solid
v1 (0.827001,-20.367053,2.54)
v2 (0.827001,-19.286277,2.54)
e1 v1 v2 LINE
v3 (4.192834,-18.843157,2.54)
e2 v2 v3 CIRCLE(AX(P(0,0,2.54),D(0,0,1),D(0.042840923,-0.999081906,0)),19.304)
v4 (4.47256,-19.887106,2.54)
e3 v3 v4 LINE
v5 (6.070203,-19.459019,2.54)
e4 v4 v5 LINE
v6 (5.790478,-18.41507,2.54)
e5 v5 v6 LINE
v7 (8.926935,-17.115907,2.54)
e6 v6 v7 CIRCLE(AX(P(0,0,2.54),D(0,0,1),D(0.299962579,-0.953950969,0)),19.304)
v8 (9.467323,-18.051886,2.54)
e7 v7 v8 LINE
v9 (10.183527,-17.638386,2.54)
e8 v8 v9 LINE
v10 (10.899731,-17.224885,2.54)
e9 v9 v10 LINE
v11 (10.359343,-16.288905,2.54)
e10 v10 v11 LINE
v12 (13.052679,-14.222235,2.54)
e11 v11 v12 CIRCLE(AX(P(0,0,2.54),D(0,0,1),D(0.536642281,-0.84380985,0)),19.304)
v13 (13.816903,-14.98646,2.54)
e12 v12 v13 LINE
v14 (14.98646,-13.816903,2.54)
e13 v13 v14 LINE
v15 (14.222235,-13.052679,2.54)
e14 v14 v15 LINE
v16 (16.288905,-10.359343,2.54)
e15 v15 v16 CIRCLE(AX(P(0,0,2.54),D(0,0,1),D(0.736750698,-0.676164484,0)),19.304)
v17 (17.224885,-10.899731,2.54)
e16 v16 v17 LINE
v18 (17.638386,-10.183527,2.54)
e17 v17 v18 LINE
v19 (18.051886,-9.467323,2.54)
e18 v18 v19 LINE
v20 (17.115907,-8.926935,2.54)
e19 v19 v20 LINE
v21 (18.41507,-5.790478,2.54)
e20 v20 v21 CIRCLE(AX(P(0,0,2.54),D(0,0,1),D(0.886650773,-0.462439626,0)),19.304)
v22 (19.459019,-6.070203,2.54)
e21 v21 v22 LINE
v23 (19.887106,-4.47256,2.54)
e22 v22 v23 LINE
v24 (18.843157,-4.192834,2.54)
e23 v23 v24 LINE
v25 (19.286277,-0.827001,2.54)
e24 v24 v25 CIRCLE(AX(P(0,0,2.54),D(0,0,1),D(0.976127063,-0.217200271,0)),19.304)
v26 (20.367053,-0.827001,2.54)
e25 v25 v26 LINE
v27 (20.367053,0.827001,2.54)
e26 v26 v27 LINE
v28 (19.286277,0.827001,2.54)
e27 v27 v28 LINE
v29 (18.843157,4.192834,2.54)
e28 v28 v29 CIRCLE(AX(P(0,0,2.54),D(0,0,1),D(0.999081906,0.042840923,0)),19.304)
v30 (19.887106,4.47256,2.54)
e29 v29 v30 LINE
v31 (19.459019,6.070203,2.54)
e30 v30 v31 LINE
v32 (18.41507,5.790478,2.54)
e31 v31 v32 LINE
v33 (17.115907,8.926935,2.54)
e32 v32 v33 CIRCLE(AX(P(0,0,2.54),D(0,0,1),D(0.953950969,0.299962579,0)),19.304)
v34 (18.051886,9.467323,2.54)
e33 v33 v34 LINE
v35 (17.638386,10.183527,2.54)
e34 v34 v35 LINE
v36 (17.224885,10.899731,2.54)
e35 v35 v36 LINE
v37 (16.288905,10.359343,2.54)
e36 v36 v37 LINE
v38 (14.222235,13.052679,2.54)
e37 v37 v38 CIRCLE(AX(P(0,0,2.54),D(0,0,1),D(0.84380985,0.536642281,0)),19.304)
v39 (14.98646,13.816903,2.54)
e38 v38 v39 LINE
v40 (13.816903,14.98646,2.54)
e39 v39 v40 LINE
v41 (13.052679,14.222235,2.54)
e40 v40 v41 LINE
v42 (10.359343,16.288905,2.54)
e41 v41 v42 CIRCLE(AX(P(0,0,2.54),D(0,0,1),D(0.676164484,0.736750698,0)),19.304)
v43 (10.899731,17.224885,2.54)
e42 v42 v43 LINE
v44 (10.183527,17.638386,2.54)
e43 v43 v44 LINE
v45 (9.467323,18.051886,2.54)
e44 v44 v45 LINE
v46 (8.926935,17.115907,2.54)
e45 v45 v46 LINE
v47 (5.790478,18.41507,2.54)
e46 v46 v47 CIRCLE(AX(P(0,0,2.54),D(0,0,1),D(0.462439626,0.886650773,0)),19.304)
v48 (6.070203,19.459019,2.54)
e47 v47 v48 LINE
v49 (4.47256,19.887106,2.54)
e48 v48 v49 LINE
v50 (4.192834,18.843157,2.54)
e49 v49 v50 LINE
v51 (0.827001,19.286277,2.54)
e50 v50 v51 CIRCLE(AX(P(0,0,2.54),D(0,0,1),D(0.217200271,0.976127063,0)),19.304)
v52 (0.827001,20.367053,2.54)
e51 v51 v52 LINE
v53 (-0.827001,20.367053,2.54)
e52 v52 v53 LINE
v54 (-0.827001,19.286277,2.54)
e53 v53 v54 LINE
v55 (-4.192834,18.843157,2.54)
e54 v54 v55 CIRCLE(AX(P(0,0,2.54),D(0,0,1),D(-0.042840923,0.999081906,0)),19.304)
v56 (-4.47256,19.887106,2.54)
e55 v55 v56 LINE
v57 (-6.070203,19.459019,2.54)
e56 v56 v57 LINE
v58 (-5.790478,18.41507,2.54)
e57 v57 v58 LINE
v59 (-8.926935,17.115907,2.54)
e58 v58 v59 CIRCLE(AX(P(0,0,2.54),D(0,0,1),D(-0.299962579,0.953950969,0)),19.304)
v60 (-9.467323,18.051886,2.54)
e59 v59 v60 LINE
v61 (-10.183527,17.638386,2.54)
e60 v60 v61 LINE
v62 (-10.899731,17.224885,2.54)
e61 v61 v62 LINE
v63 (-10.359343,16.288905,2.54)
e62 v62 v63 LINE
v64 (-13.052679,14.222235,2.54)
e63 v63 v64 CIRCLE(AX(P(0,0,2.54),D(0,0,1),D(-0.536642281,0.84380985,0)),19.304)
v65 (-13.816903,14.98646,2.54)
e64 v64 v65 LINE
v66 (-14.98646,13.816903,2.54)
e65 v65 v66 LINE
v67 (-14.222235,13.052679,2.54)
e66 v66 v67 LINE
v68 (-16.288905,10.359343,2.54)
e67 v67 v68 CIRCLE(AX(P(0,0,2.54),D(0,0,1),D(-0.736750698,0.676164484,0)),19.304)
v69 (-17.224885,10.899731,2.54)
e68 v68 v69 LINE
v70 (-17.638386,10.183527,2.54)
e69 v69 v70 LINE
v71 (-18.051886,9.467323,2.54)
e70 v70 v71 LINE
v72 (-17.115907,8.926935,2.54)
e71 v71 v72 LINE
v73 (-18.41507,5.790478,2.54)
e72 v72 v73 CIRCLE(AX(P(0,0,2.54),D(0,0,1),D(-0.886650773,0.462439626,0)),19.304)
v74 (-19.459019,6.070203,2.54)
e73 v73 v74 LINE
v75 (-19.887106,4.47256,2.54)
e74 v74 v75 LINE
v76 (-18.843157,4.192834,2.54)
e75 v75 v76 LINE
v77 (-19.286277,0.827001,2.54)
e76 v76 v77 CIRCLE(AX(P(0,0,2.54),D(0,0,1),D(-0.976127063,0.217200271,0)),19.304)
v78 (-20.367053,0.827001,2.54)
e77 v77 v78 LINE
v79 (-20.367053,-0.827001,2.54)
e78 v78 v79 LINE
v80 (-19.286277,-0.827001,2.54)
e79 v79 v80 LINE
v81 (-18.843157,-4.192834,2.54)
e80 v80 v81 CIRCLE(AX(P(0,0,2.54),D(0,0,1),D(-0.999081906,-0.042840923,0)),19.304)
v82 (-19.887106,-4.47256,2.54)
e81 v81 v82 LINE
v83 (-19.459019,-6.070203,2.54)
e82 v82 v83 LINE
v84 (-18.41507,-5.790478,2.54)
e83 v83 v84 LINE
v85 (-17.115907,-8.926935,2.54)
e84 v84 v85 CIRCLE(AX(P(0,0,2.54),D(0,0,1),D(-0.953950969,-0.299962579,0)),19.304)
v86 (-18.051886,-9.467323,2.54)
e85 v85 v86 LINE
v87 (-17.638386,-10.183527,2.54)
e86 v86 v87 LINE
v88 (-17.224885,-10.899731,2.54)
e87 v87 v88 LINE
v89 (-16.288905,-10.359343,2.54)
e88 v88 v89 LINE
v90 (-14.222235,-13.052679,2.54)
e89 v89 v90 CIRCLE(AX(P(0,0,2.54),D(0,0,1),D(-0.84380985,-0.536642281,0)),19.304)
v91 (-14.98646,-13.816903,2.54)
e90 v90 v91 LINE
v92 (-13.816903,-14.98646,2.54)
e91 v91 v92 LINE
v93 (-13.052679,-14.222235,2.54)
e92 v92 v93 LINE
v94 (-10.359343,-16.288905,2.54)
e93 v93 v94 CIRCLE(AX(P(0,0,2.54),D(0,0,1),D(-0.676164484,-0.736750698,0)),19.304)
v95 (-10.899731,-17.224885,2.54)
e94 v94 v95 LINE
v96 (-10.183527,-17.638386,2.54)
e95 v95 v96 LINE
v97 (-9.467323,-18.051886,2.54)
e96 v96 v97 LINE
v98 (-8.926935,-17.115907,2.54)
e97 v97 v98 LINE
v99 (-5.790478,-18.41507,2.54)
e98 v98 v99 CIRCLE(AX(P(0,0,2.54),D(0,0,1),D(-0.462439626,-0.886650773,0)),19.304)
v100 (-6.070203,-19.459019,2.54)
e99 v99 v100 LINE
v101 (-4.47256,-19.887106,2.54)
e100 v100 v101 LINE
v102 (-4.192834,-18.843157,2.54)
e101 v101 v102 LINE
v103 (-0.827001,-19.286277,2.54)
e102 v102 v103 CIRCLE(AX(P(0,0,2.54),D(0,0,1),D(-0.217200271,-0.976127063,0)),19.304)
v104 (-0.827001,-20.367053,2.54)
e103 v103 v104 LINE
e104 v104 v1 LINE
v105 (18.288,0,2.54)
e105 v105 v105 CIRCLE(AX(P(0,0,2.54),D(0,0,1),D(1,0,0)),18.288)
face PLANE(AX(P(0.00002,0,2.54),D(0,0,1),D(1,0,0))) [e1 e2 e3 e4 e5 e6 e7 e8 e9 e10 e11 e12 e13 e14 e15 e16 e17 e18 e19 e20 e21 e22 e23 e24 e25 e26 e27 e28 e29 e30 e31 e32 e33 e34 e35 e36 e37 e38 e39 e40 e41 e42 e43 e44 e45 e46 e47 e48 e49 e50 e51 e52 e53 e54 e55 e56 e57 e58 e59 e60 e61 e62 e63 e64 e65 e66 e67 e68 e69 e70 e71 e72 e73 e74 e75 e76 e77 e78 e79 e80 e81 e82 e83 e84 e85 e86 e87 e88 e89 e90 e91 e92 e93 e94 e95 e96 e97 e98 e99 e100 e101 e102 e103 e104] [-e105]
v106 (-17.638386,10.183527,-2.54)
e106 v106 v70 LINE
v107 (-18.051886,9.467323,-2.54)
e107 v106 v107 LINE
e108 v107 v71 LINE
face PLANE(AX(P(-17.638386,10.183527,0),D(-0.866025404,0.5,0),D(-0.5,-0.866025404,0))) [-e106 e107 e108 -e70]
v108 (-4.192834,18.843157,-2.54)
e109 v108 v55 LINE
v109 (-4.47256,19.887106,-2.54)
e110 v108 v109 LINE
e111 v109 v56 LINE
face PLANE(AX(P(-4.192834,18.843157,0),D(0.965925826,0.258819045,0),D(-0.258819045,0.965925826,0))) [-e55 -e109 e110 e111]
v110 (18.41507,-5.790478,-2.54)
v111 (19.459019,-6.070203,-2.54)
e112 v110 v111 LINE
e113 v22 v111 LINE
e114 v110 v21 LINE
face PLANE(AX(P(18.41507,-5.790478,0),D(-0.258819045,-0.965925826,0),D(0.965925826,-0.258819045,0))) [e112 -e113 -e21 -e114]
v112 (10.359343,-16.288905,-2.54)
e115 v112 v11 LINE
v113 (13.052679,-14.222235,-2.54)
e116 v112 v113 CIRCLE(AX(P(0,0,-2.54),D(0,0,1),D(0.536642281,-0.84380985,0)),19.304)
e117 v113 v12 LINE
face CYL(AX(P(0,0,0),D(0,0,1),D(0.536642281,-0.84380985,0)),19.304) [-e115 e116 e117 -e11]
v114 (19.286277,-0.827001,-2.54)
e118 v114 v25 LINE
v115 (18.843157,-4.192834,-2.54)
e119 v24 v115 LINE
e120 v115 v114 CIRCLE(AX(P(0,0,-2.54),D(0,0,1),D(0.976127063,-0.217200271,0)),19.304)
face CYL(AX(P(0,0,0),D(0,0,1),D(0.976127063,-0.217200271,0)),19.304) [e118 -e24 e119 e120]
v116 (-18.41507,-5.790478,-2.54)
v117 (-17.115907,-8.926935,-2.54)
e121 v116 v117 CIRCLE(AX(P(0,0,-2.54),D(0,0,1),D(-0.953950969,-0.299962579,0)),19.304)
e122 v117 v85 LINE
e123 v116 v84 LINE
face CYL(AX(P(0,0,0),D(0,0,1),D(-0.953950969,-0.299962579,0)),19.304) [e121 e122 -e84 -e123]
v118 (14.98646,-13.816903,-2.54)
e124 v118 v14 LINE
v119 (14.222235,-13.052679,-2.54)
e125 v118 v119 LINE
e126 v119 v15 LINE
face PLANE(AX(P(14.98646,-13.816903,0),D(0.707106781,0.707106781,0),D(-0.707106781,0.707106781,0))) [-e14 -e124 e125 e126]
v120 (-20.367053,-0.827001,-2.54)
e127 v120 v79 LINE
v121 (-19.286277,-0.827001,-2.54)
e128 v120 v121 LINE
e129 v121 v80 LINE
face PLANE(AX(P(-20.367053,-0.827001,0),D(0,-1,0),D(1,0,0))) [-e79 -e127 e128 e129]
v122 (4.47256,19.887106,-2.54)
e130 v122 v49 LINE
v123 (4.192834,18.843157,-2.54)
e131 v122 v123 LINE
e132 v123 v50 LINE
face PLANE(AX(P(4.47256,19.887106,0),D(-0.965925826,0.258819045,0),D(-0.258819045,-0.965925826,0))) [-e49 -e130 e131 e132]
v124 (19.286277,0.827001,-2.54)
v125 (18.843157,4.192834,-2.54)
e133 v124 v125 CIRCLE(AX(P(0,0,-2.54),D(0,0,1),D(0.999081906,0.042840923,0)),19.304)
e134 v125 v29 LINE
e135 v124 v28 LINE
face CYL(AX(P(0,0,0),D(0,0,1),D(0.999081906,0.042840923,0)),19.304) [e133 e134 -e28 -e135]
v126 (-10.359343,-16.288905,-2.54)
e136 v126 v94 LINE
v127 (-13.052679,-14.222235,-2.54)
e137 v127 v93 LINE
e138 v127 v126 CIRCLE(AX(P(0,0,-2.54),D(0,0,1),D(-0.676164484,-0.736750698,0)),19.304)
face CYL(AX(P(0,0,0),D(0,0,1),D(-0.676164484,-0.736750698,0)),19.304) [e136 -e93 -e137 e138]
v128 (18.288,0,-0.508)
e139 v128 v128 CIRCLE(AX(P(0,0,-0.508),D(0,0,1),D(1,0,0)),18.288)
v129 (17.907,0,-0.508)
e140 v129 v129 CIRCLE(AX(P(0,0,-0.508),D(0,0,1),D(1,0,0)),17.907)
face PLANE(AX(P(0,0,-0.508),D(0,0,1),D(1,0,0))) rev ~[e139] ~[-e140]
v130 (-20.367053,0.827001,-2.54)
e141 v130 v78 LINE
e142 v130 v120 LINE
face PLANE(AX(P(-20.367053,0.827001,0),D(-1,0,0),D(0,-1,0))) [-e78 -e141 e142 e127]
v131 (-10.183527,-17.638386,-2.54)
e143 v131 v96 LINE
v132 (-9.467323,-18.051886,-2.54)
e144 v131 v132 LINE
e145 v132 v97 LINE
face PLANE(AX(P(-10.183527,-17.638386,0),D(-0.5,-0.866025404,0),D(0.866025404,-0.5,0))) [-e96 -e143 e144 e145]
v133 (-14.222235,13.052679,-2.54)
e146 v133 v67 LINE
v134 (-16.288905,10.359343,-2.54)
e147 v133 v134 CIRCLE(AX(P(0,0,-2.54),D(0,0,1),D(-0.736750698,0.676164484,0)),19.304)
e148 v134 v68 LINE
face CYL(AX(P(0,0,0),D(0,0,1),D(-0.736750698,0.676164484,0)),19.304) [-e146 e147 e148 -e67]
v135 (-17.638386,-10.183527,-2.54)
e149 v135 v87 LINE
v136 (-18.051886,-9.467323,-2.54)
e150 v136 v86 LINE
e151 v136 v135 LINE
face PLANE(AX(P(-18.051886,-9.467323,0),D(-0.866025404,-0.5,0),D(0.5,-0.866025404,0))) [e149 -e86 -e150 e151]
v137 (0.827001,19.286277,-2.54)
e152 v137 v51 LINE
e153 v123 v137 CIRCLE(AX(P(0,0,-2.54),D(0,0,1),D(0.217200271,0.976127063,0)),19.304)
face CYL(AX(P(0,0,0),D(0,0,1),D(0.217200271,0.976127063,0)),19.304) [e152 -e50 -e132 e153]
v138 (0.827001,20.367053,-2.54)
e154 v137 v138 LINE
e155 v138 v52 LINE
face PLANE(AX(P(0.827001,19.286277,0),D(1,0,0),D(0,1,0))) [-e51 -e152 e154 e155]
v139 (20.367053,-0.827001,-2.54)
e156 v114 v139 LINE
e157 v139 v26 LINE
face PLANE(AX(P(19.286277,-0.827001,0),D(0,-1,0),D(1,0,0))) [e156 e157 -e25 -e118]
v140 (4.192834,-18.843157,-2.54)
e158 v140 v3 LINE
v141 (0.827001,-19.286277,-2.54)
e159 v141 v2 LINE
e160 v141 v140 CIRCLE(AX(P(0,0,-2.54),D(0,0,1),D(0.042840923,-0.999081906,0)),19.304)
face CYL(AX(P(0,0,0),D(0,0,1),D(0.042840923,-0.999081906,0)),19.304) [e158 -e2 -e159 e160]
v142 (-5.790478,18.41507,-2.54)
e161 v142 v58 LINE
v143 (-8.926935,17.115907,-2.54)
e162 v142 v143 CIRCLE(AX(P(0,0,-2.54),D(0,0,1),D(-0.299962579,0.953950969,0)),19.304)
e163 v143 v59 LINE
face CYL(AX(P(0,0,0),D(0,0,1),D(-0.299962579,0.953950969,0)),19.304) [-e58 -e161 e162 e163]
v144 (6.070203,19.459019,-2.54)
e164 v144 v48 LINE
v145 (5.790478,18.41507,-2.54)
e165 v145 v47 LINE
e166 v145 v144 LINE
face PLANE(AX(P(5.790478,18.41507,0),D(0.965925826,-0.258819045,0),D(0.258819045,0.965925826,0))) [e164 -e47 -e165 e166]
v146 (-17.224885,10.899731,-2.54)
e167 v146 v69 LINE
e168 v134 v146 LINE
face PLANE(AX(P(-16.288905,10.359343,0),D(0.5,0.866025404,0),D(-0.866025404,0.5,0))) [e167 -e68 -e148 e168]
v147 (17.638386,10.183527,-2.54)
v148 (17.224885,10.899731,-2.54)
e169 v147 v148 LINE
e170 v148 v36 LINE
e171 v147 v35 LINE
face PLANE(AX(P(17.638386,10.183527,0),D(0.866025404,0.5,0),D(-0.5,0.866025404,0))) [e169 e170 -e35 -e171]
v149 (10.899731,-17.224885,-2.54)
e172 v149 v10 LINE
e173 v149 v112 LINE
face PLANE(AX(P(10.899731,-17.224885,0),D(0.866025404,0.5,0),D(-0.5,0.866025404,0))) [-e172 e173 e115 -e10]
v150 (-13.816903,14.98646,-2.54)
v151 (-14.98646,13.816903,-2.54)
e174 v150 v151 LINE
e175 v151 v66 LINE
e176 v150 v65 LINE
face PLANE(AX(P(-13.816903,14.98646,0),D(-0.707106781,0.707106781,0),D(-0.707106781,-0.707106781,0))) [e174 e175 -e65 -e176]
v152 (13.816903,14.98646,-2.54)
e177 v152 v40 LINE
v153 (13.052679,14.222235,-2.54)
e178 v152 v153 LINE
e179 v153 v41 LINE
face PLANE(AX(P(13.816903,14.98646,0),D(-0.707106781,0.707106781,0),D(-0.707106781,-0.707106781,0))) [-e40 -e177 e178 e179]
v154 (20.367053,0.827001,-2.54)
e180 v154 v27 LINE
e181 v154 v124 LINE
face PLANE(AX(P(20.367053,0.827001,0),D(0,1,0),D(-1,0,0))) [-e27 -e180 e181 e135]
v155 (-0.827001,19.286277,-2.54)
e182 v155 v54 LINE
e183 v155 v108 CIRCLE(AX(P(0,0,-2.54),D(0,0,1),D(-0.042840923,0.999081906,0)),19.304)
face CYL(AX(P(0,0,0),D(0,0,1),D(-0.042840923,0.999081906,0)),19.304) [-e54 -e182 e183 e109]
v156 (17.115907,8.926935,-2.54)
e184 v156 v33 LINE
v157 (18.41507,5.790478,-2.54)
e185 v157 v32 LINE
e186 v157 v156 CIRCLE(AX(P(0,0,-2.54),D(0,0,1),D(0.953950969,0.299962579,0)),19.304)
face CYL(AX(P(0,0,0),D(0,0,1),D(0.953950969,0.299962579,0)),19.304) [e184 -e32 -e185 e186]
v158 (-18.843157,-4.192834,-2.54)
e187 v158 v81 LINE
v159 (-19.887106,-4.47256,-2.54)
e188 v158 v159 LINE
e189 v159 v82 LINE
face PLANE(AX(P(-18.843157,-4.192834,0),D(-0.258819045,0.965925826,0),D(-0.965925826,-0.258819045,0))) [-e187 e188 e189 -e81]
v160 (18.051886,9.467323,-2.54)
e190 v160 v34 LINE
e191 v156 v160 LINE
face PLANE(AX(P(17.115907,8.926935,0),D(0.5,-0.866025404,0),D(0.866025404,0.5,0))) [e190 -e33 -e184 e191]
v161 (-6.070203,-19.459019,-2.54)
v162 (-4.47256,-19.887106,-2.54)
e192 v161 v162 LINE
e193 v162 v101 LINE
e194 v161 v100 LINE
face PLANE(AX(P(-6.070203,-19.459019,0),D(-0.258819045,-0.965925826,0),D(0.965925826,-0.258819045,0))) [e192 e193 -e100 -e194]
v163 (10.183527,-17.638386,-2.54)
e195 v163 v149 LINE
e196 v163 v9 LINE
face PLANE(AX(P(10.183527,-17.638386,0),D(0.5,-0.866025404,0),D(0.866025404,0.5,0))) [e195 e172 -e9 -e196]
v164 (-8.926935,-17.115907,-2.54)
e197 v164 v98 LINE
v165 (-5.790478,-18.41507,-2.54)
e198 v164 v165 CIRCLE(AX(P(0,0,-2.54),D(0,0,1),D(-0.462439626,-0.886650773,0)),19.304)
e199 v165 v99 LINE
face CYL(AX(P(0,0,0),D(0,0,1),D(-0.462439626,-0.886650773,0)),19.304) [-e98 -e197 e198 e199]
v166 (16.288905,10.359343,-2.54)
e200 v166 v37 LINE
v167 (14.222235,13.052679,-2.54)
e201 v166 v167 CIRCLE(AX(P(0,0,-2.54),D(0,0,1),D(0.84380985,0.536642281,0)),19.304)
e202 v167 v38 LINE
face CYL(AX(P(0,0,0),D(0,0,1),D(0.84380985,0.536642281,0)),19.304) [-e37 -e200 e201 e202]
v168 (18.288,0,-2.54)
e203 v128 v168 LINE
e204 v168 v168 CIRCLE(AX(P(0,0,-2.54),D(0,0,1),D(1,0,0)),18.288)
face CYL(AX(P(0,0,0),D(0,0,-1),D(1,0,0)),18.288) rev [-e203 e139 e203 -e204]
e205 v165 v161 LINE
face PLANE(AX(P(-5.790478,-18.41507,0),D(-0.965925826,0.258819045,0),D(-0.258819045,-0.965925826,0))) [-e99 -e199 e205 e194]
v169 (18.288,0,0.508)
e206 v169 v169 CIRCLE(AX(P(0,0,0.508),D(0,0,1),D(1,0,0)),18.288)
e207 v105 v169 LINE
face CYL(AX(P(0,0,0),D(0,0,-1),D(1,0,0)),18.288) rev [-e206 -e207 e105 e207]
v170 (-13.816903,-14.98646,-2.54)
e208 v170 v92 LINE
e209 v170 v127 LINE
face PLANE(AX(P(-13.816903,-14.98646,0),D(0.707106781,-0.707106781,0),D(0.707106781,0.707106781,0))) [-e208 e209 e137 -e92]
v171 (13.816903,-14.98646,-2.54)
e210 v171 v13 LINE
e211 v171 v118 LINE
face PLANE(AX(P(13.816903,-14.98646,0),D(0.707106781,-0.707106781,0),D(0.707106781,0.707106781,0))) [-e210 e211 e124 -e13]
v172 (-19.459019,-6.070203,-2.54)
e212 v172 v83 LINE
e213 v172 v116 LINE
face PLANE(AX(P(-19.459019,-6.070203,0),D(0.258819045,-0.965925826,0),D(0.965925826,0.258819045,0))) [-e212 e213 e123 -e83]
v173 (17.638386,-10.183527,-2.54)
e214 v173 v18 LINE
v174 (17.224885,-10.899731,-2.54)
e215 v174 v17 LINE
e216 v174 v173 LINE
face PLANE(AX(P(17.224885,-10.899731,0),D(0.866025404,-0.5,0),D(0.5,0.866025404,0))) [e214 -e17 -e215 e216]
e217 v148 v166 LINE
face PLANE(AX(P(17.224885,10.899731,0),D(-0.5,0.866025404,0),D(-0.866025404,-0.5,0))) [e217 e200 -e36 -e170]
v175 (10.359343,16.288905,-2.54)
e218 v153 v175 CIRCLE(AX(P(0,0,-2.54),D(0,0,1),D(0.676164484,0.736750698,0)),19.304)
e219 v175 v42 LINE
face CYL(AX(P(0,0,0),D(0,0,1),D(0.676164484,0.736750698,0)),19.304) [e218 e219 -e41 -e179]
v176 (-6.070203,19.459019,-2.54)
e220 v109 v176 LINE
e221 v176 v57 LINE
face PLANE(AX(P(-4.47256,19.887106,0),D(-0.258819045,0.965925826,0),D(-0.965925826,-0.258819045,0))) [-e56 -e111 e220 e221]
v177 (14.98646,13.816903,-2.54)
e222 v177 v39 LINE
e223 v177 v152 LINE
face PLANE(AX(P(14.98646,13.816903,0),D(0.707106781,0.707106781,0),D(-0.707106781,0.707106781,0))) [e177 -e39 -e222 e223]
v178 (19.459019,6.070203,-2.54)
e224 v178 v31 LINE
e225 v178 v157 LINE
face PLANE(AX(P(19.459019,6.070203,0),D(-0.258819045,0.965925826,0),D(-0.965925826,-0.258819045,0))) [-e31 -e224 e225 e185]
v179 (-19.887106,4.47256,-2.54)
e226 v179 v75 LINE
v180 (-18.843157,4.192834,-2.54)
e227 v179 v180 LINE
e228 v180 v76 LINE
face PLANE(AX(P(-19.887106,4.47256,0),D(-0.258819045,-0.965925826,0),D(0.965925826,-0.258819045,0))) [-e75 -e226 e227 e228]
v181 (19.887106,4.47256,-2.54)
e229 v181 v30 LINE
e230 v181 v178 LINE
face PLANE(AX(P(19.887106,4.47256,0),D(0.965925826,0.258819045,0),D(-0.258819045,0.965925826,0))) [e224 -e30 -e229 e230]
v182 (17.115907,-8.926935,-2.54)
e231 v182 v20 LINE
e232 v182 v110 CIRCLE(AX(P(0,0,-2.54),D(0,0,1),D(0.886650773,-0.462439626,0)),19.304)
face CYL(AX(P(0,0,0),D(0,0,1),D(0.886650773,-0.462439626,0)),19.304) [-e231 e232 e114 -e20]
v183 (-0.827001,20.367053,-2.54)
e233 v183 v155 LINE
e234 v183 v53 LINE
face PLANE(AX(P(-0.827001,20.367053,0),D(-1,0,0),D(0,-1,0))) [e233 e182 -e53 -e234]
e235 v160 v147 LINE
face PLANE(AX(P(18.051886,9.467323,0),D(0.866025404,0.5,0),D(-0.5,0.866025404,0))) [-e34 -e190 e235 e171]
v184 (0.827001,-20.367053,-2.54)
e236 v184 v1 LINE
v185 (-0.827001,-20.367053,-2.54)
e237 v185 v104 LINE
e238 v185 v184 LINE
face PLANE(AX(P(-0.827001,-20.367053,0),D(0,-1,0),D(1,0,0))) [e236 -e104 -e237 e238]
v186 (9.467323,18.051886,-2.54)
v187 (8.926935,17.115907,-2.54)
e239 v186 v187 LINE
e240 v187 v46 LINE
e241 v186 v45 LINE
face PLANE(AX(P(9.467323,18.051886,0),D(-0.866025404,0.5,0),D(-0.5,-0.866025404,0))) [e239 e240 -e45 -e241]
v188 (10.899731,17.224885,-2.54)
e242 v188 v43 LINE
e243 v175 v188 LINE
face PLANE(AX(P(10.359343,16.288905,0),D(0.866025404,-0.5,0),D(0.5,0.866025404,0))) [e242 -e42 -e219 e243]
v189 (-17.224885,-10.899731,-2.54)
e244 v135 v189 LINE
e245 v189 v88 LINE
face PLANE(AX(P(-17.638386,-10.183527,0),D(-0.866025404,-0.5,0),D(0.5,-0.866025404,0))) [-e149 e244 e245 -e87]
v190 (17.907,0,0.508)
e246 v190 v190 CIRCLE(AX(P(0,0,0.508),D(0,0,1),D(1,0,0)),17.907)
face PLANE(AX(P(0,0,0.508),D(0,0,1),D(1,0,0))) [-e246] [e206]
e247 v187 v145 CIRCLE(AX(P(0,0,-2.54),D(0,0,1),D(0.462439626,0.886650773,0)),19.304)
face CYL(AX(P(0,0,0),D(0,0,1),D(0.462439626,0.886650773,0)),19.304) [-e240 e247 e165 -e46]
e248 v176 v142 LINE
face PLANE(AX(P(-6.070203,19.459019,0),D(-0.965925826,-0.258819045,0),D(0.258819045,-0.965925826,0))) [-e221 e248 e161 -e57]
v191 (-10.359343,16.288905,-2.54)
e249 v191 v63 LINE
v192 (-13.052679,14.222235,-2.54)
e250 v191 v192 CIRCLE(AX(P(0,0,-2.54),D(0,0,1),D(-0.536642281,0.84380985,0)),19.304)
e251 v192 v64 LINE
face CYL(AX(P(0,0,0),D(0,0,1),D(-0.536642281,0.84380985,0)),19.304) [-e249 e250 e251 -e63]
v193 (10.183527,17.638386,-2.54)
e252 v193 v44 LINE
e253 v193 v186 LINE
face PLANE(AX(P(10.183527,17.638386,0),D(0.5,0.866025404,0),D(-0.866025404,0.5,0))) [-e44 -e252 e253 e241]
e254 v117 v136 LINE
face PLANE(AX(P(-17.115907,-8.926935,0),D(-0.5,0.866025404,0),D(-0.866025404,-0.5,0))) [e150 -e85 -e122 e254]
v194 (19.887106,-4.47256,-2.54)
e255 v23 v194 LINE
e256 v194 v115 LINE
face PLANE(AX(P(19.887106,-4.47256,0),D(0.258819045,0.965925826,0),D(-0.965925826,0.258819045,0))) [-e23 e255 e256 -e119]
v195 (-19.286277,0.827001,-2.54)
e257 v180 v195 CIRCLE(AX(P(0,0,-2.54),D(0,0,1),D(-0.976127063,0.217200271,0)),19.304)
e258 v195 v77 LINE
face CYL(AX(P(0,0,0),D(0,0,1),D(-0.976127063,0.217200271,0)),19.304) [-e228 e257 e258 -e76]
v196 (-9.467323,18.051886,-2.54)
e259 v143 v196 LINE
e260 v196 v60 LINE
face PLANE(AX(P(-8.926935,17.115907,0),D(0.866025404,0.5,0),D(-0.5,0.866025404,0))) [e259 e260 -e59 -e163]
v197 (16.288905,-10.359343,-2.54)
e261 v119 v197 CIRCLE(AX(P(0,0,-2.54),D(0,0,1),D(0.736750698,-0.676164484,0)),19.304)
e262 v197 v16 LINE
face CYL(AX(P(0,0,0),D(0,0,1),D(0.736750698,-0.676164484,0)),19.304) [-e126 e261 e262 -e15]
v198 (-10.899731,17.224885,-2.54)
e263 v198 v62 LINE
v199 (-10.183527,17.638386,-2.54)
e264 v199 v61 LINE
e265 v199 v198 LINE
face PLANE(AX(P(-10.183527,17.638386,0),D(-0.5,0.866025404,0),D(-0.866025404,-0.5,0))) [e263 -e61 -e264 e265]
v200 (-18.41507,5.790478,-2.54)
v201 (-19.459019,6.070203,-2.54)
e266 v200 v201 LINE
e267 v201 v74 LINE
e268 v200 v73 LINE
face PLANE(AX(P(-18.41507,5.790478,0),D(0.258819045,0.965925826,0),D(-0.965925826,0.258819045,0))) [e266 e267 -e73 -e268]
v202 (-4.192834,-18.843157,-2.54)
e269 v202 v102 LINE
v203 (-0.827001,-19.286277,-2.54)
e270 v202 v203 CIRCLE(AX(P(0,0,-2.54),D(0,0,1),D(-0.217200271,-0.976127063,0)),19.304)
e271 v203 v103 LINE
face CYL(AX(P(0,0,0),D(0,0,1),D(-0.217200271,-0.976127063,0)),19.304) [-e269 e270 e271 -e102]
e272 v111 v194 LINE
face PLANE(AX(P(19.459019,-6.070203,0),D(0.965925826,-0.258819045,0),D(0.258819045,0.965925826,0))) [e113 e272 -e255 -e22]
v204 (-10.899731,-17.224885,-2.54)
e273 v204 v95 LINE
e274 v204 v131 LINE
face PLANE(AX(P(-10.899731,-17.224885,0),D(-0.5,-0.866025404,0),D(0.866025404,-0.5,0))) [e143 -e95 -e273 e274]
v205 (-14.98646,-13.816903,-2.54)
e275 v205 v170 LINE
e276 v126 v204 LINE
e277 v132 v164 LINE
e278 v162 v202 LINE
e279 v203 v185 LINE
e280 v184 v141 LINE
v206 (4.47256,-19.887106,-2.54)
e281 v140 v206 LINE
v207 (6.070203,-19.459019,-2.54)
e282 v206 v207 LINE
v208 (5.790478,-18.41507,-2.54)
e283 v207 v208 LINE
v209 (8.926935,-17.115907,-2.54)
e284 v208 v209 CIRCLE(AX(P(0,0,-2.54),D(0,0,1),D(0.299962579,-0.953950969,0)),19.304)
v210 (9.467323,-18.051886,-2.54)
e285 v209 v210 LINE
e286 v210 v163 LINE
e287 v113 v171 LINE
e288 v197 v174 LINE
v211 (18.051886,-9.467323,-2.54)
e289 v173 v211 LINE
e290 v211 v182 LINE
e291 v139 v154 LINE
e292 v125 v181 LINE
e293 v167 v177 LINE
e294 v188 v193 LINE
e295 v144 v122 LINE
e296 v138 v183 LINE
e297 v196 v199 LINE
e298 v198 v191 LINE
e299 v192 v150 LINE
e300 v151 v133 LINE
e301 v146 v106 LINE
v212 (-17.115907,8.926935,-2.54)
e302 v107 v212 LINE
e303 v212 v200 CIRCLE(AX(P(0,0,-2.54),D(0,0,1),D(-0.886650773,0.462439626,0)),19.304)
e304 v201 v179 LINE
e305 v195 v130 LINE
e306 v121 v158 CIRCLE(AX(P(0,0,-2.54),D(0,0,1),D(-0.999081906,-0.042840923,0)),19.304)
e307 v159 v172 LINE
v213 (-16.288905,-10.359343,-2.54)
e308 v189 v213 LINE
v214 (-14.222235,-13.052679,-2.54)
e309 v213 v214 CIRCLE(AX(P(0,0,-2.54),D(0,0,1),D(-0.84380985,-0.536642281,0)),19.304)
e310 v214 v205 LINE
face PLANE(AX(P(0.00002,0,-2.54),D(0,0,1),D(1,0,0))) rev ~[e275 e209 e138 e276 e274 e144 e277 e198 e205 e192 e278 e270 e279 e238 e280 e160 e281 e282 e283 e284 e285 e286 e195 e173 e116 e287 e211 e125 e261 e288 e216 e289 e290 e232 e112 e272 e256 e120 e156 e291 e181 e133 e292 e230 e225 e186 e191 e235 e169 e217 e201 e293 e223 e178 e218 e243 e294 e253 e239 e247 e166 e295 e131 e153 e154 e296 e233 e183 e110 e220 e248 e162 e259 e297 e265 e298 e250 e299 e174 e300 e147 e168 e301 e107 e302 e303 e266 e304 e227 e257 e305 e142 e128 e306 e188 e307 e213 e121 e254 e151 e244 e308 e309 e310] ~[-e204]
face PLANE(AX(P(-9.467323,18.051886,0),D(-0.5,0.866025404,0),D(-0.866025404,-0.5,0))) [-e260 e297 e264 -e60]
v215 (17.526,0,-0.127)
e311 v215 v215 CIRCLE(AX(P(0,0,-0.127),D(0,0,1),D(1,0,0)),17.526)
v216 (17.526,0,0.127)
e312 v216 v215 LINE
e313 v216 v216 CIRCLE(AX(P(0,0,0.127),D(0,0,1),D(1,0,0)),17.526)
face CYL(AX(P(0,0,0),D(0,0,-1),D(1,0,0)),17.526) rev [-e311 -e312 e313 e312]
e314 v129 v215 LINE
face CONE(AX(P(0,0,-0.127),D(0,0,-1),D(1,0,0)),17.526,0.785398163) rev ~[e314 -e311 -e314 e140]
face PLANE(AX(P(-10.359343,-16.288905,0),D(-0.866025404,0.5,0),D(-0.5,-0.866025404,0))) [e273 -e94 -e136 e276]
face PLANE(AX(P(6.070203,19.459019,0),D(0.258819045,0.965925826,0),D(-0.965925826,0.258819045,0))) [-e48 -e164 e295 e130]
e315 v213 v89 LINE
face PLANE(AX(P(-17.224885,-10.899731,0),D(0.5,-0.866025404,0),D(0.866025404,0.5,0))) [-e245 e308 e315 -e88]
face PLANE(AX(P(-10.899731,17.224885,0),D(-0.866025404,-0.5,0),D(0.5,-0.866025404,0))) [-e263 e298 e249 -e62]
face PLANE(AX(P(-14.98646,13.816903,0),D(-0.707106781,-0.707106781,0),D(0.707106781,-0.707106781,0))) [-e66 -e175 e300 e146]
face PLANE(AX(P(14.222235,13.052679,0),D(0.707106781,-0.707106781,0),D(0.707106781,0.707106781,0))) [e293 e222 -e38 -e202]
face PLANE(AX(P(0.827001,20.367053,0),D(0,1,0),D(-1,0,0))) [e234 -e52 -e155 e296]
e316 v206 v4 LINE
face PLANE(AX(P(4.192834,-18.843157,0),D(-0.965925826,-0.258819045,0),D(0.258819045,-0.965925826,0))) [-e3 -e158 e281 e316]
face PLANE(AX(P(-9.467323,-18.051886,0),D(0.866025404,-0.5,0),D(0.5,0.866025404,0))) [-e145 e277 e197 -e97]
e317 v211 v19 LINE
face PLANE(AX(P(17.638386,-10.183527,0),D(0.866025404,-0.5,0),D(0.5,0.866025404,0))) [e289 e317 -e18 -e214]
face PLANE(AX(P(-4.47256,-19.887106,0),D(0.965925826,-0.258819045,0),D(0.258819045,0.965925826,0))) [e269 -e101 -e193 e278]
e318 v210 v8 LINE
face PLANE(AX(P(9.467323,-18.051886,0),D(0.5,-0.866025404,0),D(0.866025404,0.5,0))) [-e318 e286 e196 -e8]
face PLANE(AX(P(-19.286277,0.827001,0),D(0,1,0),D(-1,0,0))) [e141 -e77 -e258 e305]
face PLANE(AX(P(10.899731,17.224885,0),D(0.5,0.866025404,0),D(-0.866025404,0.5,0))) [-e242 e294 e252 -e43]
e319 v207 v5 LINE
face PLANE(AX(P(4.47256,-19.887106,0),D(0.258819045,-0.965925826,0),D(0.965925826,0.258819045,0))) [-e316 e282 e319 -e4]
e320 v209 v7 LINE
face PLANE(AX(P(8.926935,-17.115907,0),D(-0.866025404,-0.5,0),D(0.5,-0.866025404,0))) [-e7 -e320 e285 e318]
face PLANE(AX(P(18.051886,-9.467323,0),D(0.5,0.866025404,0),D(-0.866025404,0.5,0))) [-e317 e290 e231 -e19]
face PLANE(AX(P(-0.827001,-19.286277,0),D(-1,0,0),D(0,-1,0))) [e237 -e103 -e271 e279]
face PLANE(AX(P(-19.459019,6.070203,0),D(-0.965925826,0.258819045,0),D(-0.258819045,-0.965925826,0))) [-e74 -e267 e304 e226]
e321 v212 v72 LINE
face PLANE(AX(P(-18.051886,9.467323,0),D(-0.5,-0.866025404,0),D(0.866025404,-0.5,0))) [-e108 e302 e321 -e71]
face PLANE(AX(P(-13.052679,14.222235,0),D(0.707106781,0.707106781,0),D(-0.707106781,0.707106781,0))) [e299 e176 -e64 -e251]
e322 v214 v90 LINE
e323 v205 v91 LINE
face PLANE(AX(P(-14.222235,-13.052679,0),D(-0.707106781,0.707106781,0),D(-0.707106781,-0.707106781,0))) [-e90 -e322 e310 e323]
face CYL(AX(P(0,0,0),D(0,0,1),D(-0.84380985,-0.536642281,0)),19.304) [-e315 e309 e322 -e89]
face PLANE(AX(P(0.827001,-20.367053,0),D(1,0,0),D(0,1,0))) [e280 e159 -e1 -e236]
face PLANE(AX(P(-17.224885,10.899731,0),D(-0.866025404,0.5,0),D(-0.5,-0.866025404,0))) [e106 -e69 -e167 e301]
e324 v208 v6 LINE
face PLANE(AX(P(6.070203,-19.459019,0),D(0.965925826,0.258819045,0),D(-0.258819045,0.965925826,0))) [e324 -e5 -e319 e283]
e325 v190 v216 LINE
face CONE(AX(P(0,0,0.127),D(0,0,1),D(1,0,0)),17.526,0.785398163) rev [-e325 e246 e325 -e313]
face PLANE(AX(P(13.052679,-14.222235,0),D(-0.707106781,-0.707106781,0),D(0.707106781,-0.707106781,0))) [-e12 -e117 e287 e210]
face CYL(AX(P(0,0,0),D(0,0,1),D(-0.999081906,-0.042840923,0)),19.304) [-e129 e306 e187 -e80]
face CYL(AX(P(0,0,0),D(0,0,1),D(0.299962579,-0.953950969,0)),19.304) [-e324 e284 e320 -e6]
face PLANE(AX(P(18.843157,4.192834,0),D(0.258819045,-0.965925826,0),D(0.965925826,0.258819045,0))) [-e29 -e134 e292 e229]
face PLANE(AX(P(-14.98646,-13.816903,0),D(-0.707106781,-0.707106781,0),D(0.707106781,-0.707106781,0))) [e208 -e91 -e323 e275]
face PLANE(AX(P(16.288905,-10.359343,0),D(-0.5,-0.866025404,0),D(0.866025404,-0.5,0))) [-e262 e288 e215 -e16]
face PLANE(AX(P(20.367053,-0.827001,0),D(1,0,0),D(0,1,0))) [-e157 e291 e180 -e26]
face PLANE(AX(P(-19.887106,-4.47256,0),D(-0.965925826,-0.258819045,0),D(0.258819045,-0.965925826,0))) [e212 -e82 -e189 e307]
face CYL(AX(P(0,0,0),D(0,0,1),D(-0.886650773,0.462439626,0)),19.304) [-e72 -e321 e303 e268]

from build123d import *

# Parameters (mm, degrees)
F0_R     = 18.288
F1_DEPTH = 2.54
F0_R_2   = 17.526
F2_DEPTH = 0.508
F3_SIZE  = 0.381
F4_DEPTH = 2.54


# Not quite as in the source:
# - a feature names something its author has since deleted; it is built from what else it names


with BuildPart() as f1:
    # F0 (on Top) → F1 (new body, symmetric)
    with BuildSketch(Plane.XY):
        with BuildLine():
            ThreePointArc((19.2862771176, -0.8270011749), (19.2995687708, -0.4135955282), (19.304, 0))
            ThreePointArc((19.304, 0), (19.2995687708, 0.4135955282), (19.2862771176, 0.8270011749))
            ThreePointArc((19.2862771176, 0.8270011749), (19.138851604, 2.5196776146), (18.8431568152, 4.1928340339))
            ThreePointArc((18.8431568152, 4.1928340339), (18.6462321507, 4.9962428467), (18.4150695065, 5.7904776204))
            ThreePointArc((18.4150695065, 5.7904776204), (17.8345704956, 7.3873209784), (17.1159065157, 8.9269345324))
            ThreePointArc((17.1159065157, 8.9269345324), (16.7177543947, 9.652), (16.2889053408, 10.3593425852))
            ThreePointArc((16.2889053408, 10.3593425852), (15.314892881, 11.7515306256), (14.2222354725, 13.0526791949))
            ThreePointArc((14.2222354725, 13.0526791949), (13.649989304, 13.649989304), (13.0526791949, 14.2222354725))
            ThreePointArc((13.0526791949, 14.2222354725), (11.7515306256, 15.314892881), (10.3593425852, 16.2889053408))
            ThreePointArc((10.3593425852, 16.2889053408), (9.652, 16.7177543947), (8.9269345324, 17.1159065157))
            ThreePointArc((8.9269345324, 17.1159065157), (7.3873209784, 17.8345704956), (5.7904776204, 18.4150695065))
            ThreePointArc((5.7904776204, 18.4150695065), (4.9962428467, 18.6462321507), (4.1928340339, 18.8431568152))
            ThreePointArc((4.1928340339, 18.8431568152), (2.5196776146, 19.138851604), (0.8270011749, 19.2862771176))
            ThreePointArc((0.8270011749, 19.2862771176), (0, 19.304), (-0.8270011749, 19.2862771176))
            ThreePointArc((-0.8270011749, 19.2862771176), (-2.5196776146, 19.138851604), (-4.1928340339, 18.8431568152))
            ThreePointArc((-4.1928340339, 18.8431568152), (-4.9962428467, 18.6462321507), (-5.7904776204, 18.4150695065))
            ThreePointArc((-5.7904776204, 18.4150695065), (-7.3873209784, 17.8345704956), (-8.9269345324, 17.1159065157))
            ThreePointArc((-8.9269345324, 17.1159065157), (-9.652, 16.7177543947), (-10.3593425852, 16.2889053408))
            ThreePointArc((-10.3593425852, 16.2889053408), (-11.7515306256, 15.314892881), (-13.0526791949, 14.2222354725))
            ThreePointArc((-13.0526791949, 14.2222354725), (-13.649989304, 13.649989304), (-14.2222354725, 13.0526791949))
            ThreePointArc((-14.2222354725, 13.0526791949), (-15.314892881, 11.7515306256), (-16.2889053408, 10.3593425852))
            ThreePointArc((-16.2889053408, 10.3593425852), (-16.7177543947, 9.652), (-17.1159065157, 8.9269345324))
            ThreePointArc((-17.1159065157, 8.9269345324), (-17.8345704956, 7.3873209784), (-18.4150695065, 5.7904776204))
            ThreePointArc((-18.4150695065, 5.7904776204), (-18.6462321507, 4.9962428467), (-18.8431568152, 4.1928340339))
            ThreePointArc((-18.8431568152, 4.1928340339), (-19.138851604, 2.5196776146), (-19.2862771176, 0.8270011749))
            ThreePointArc((-19.2862771176, 0.8270011749), (-19.304, 0), (-19.2862771176, -0.8270011749))
            ThreePointArc((-19.2862771176, -0.8270011749), (-19.138851604, -2.5196776146), (-18.8431568152, -4.1928340339))
            ThreePointArc((-18.8431568152, -4.1928340339), (-18.6462321507, -4.9962428467), (-18.4150695065, -5.7904776204))
            ThreePointArc((-18.4150695065, -5.7904776204), (-17.8345704956, -7.3873209784), (-17.1159065157, -8.9269345324))
            ThreePointArc((-17.1159065157, -8.9269345324), (-16.7177543947, -9.652), (-16.2889053408, -10.3593425852))
            ThreePointArc((-16.2889053408, -10.3593425852), (-15.314892881, -11.7515306256), (-14.2222354725, -13.0526791949))
            ThreePointArc((-14.2222354725, -13.0526791949), (-13.649989304, -13.649989304), (-13.0526791949, -14.2222354725))
            ThreePointArc((-13.0526791949, -14.2222354725), (-11.7515306256, -15.314892881), (-10.3593425852, -16.2889053408))
            ThreePointArc((-10.3593425852, -16.2889053408), (-9.652, -16.7177543947), (-8.9269345324, -17.1159065157))
            ThreePointArc((-8.9269345324, -17.1159065157), (-7.3873209784, -17.8345704956), (-5.7904776204, -18.4150695065))
            ThreePointArc((-5.7904776204, -18.4150695065), (-4.9962428467, -18.6462321507), (-4.1928340339, -18.8431568152))
            ThreePointArc((-4.1928340339, -18.8431568152), (-2.5196776146, -19.138851604), (-0.8270011749, -19.2862771176))
            ThreePointArc((-0.8270011749, -19.2862771176), (0, -19.304), (0.8270011749, -19.2862771176))
            ThreePointArc((0.8270011749, -19.2862771176), (2.5196776146, -19.138851604), (4.1928340339, -18.8431568152))
            ThreePointArc((4.1928340339, -18.8431568152), (4.9962428467, -18.6462321507), (5.7904776204, -18.4150695065))
            ThreePointArc((5.7904776204, -18.4150695065), (7.3873209784, -17.8345704956), (8.9269345324, -17.1159065157))
            ThreePointArc((8.9269345324, -17.1159065157), (9.652, -16.7177543947), (10.3593425852, -16.2889053408))
            ThreePointArc((10.3593425852, -16.2889053408), (11.7515306256, -15.314892881), (13.0526791949, -14.2222354725))
            ThreePointArc((13.0526791949, -14.2222354725), (13.649989304, -13.649989304), (14.2222354725, -13.0526791949))
            ThreePointArc((14.2222354725, -13.0526791949), (15.314892881, -11.7515306256), (16.2889053408, -10.3593425852))
            ThreePointArc((16.2889053408, -10.3593425852), (16.7177543947, -9.652), (17.1159065157, -8.9269345324))
            ThreePointArc((17.1159065157, -8.9269345324), (17.8345704956, -7.3873209784), (18.4150695065, -5.7904776204))
            ThreePointArc((18.4150695065, -5.7904776204), (18.6462321507, -4.9962428467), (18.8431568152, -4.1928340339))
            ThreePointArc((18.8431568152, -4.1928340339), (19.138851604, -2.5196776146), (19.2862771176, -0.8270011749))
        make_face()
        Circle(F0_R, mode=Mode.SUBTRACT)
        with BuildLine():
            ThreePointArc((19.2862771176, 0.8270011749), (19.2995687708, 0.4135955282), (19.304, 0))
            ThreePointArc((19.304, 0), (19.2995687708, -0.4135955282), (19.2862771176, -0.8270011749))
            Line((19.2862771176, -0.8270011749), (20.3670533557, -0.8270011749))
            Line((20.3670533557, -0.8270011749), (20.3670533557, 0))
            Line((20.3670533557, 0), (20.3670533557, 0.8270011749))
            Line((20.3670533557, 0.8270011749), (19.2862771176, 0.8270011749))
        make_face()
        with BuildLine():
            ThreePointArc((18.4150695065, 5.7904776204), (18.6462321507, 4.9962428467), (18.8431568152, 4.1928340339))
            Line((18.8431568152, 4.1928340339), (19.8871064961, 4.4725595079))
            Line((19.8871064961, 4.4725595079), (19.6730628417, 5.2713813011))
            Line((19.6730628417, 5.2713813011), (19.4590191873, 6.0702030943))
            Line((19.4590191873, 6.0702030943), (18.4150695065, 5.7904776204))
        make_face()
        with BuildLine():
            Line((19.8871064961, -4.4725595079), (18.8431568152, -4.1928340339))
            ThreePointArc((18.8431568152, -4.1928340339), (18.6462321507, -4.9962428467), (18.4150695065, -5.7904776204))
            Line((18.4150695065, -5.7904776204), (19.4590191873, -6.0702030943))
            Line((19.4590191873, -6.0702030943), (19.6730628417, -5.2713813011))
            Line((19.6730628417, -5.2713813011), (19.8871064961, -4.4725595079))
        make_face()
        with BuildLine():
            ThreePointArc((16.2889053408, 10.3593425852), (16.7177543947, 9.652), (17.1159065157, 8.9269345324))
            Line((17.1159065157, 8.9269345324), (18.0518861937, 9.4673226514))
            Line((18.0518861937, 9.4673226514), (17.6383856063, 10.1835266779))
            Line((17.6383856063, 10.1835266779), (17.2248850188, 10.8997307043))
            Line((17.2248850188, 10.8997307043), (16.2889053408, 10.3593425852))
        make_face()
        with BuildLine():
            Line((18.0518861937, -9.4673226514), (17.1159065157, -8.9269345324))
            ThreePointArc((17.1159065157, -8.9269345324), (16.7177543947, -9.652), (16.2889053408, -10.3593425852))
            Line((16.2889053408, -10.3593425852), (17.2248850188, -10.8997307043))
            Line((17.2248850188, -10.8997307043), (17.6383856063, -10.1835266779))
            Line((17.6383856063, -10.1835266779), (18.0518861937, -9.4673226514))
        make_face()
        with BuildLine():
            ThreePointArc((13.0526791949, 14.2222354725), (13.649989304, 13.649989304), (14.2222354725, 13.0526791949))
            Line((14.2222354725, 13.0526791949), (14.9864596794, 13.8169034018))
            Line((14.9864596794, 13.8169034018), (14.4016815406, 14.4016815406))
            Line((14.4016815406, 14.4016815406), (13.8169034018, 14.9864596794))
            Line((13.8169034018, 14.9864596794), (13.0526791949, 14.2222354725))
        make_face()
        with BuildLine():
            Line((14.9864596794, -13.8169034018), (14.2222354725, -13.0526791949))
            ThreePointArc((14.2222354725, -13.0526791949), (13.649989304, -13.649989304), (13.0526791949, -14.2222354725))
            Line((13.0526791949, -14.2222354725), (13.8169034018, -14.9864596794))
            Line((13.8169034018, -14.9864596794), (14.4016815406, -14.4016815406))
            Line((14.4016815406, -14.4016815406), (14.9864596794, -13.8169034018))
        make_face()
        with BuildLine():
            ThreePointArc((8.9269345324, 17.1159065157), (9.652, 16.7177543947), (10.3593425852, 16.2889053408))
            Line((10.3593425852, 16.2889053408), (10.8997307043, 17.2248850188))
            Line((10.8997307043, 17.2248850188), (10.1835266779, 17.6383856063))
            Line((10.1835266779, 17.6383856063), (9.4673226514, 18.0518861937))
            Line((9.4673226514, 18.0518861937), (8.9269345324, 17.1159065157))
        make_face()
        with BuildLine():
            Line((10.8997307043, -17.2248850188), (10.3593425852, -16.2889053408))
            ThreePointArc((10.3593425852, -16.2889053408), (9.652, -16.7177543947), (8.9269345324, -17.1159065157))
            Line((8.9269345324, -17.1159065157), (9.4673226514, -18.0518861937))
            Line((9.4673226514, -18.0518861937), (10.1835266779, -17.6383856063))
            Line((10.1835266779, -17.6383856063), (10.8997307043, -17.2248850188))
        make_face()
        with BuildLine():
            ThreePointArc((4.1928340339, 18.8431568152), (4.9962428467, 18.6462321507), (5.7904776204, 18.4150695065))
            Line((5.7904776204, 18.4150695065), (6.0702030943, 19.4590191873))
            Line((6.0702030943, 19.4590191873), (5.2713813011, 19.6730628417))
            Line((5.2713813011, 19.6730628417), (4.4725595079, 19.8871064961))
            Line((4.4725595079, 19.8871064961), (4.1928340339, 18.8431568152))
        make_face()
        with BuildLine():
            Line((6.0702030943, -19.4590191873), (5.7904776204, -18.4150695065))
            ThreePointArc((5.7904776204, -18.4150695065), (4.9962428467, -18.6462321507), (4.1928340339, -18.8431568152))
            Line((4.1928340339, -18.8431568152), (4.4725595079, -19.8871064961))
            Line((4.4725595079, -19.8871064961), (5.2713813011, -19.6730628417))
            Line((5.2713813011, -19.6730628417), (6.0702030943, -19.4590191873))
        make_face()
        with BuildLine():
            ThreePointArc((-0.8270011749, 19.2862771176), (0, 19.304), (0.8270011749, 19.2862771176))
            Line((0.8270011749, 19.2862771176), (0.8270011749, 20.3670533557))
            Line((0.8270011749, 20.3670533557), (0, 20.3670533557))
            Line((0, 20.3670533557), (-0.8270011749, 20.3670533557))
            Line((-0.8270011749, 20.3670533557), (-0.8270011749, 19.2862771176))
        make_face()
        with BuildLine():
            Line((0.8270011749, -20.3670533557), (0.8270011749, -19.2862771176))
            ThreePointArc((0.8270011749, -19.2862771176), (0, -19.304), (-0.8270011749, -19.2862771176))
            Line((-0.8270011749, -19.2862771176), (-0.8270011749, -20.3670533557))
            Line((-0.8270011749, -20.3670533557), (0, -20.3670533557))
            Line((0, -20.3670533557), (0.8270011749, -20.3670533557))
        make_face()
        with BuildLine():
            ThreePointArc((-5.7904776204, 18.4150695065), (-4.9962428467, 18.6462321507), (-4.1928340339, 18.8431568152))
            Line((-4.1928340339, 18.8431568152), (-4.4725595079, 19.8871064961))
            Line((-4.4725595079, 19.8871064961), (-5.2713813011, 19.6730628417))
            Line((-5.2713813011, 19.6730628417), (-6.0702030943, 19.4590191873))
            Line((-6.0702030943, 19.4590191873), (-5.7904776204, 18.4150695065))
        make_face()
        with BuildLine():
            Line((-4.4725595079, -19.8871064961), (-4.1928340339, -18.8431568152))
            ThreePointArc((-4.1928340339, -18.8431568152), (-4.9962428467, -18.6462321507), (-5.7904776204, -18.4150695065))
            Line((-5.7904776204, -18.4150695065), (-6.0702030943, -19.4590191873))
            Line((-6.0702030943, -19.4590191873), (-5.2713813011, -19.6730628417))
            Line((-5.2713813011, -19.6730628417), (-4.4725595079, -19.8871064961))
        make_face()
        with BuildLine():
            ThreePointArc((-10.3593425852, 16.2889053408), (-9.652, 16.7177543947), (-8.9269345324, 17.1159065157))
            Line((-8.9269345324, 17.1159065157), (-9.4673226514, 18.0518861937))
            Line((-9.4673226514, 18.0518861937), (-10.1835266779, 17.6383856063))
            Line((-10.1835266779, 17.6383856063), (-10.8997307043, 17.2248850188))
            Line((-10.8997307043, 17.2248850188), (-10.3593425852, 16.2889053408))
        make_face()
        with BuildLine():
            Line((-9.4673226514, -18.0518861937), (-8.9269345324, -17.1159065157))
            ThreePointArc((-8.9269345324, -17.1159065157), (-9.652, -16.7177543947), (-10.3593425852, -16.2889053408))
            Line((-10.3593425852, -16.2889053408), (-10.8997307043, -17.2248850188))
            Line((-10.8997307043, -17.2248850188), (-10.1835266779, -17.6383856063))
            Line((-10.1835266779, -17.6383856063), (-9.4673226514, -18.0518861937))
        make_face()
        with BuildLine():
            ThreePointArc((-14.2222354725, 13.0526791949), (-13.649989304, 13.649989304), (-13.0526791949, 14.2222354725))
            Line((-13.0526791949, 14.2222354725), (-13.8169034018, 14.9864596794))
            Line((-13.8169034018, 14.9864596794), (-14.4016815406, 14.4016815406))
            Line((-14.4016815406, 14.4016815406), (-14.9864596794, 13.8169034018))
            Line((-14.9864596794, 13.8169034018), (-14.2222354725, 13.0526791949))
        make_face()
        with BuildLine():
            Line((-13.8169034018, -14.9864596794), (-13.0526791949, -14.2222354725))
            ThreePointArc((-13.0526791949, -14.2222354725), (-13.649989304, -13.649989304), (-14.2222354725, -13.0526791949))
            Line((-14.2222354725, -13.0526791949), (-14.9864596794, -13.8169034018))
            Line((-14.9864596794, -13.8169034018), (-14.4016815406, -14.4016815406))
            Line((-14.4016815406, -14.4016815406), (-13.8169034018, -14.9864596794))
        make_face()
        with BuildLine():
            ThreePointArc((-17.1159065157, 8.9269345324), (-16.7177543947, 9.652), (-16.2889053408, 10.3593425852))
            Line((-16.2889053408, 10.3593425852), (-17.2248850188, 10.8997307043))
            Line((-17.2248850188, 10.8997307043), (-17.6383856063, 10.1835266779))
            Line((-17.6383856063, 10.1835266779), (-18.0518861937, 9.4673226514))
            Line((-18.0518861937, 9.4673226514), (-17.1159065157, 8.9269345324))
        make_face()
        with BuildLine():
            Line((-17.2248850188, -10.8997307043), (-16.2889053408, -10.3593425852))
            ThreePointArc((-16.2889053408, -10.3593425852), (-16.7177543947, -9.652), (-17.1159065157, -8.9269345324))
            Line((-17.1159065157, -8.9269345324), (-18.0518861937, -9.4673226514))
            Line((-18.0518861937, -9.4673226514), (-17.6383856063, -10.1835266779))
            Line((-17.6383856063, -10.1835266779), (-17.2248850188, -10.8997307043))
        make_face()
        with BuildLine():
            ThreePointArc((-18.8431568152, 4.1928340339), (-18.6462321507, 4.9962428467), (-18.4150695065, 5.7904776204))
            Line((-18.4150695065, 5.7904776204), (-19.4590191873, 6.0702030943))
            Line((-19.4590191873, 6.0702030943), (-19.6730628417, 5.2713813011))
            Line((-19.6730628417, 5.2713813011), (-19.8871064961, 4.4725595079))
            Line((-19.8871064961, 4.4725595079), (-18.8431568152, 4.1928340339))
        make_face()
        with BuildLine():
            Line((-19.4590191873, -6.0702030943), (-18.4150695065, -5.7904776204))
            ThreePointArc((-18.4150695065, -5.7904776204), (-18.6462321507, -4.9962428467), (-18.8431568152, -4.1928340339))
            Line((-18.8431568152, -4.1928340339), (-19.8871064961, -4.4725595079))
            Line((-19.8871064961, -4.4725595079), (-19.6730628417, -5.2713813011))
            Line((-19.6730628417, -5.2713813011), (-19.4590191873, -6.0702030943))
        make_face()
        with BuildLine():
            ThreePointArc((-19.2862771176, -0.8270011749), (-19.304, 0), (-19.2862771176, 0.8270011749))
            Line((-19.2862771176, 0.8270011749), (-20.3670533557, 0.8270011749))
            Line((-20.3670533557, 0.8270011749), (-20.3670533557, 0))
            Line((-20.3670533557, 0), (-20.3670533557, -0.8270011749))
            Line((-20.3670533557, -0.8270011749), (-19.2862771176, -0.8270011749))
        make_face()
    extrude(amount=F1_DEPTH, both=True)

    # F0 (on Top) → F2 (join, symmetric)
    with BuildSketch(Plane.XY):
        Circle(F0_R)
        Circle(F0_R_2, mode=Mode.SUBTRACT)
    extrude(amount=F2_DEPTH, both=True)

    # F3
    f3_edges = [f1.edges().sort_by_distance(p)[0] for p in [
        (-17.526, 0, 0.508),
        (17.526, 0, 0),
        (-17.526, 0, -0.508),
    ]]
    chamfer(f3_edges, length=F3_SIZE)

    # F0 (on Top) → F4 (join, symmetric)
    with BuildSketch(Plane.XY):
        with BuildLine():
            ThreePointArc((8.9269345324, 17.1159065157), (9.652, 16.7177543947), (10.3593425852, 16.2889053408))
            Line((10.3593425852, 16.2889053408), (10.8997307043, 17.2248850188))
            Line((10.8997307043, 17.2248850188), (10.1835266779, 17.6383856063))
            Line((10.1835266779, 17.6383856063), (9.4673226514, 18.0518861937))
            Line((9.4673226514, 18.0518861937), (8.9269345324, 17.1159065157))
        make_face()
        with BuildLine():
            ThreePointArc((4.1928340339, 18.8431568152), (4.9962428467, 18.6462321507), (5.7904776204, 18.4150695065))
            Line((5.7904776204, 18.4150695065), (6.0702030943, 19.4590191873))
            Line((6.0702030943, 19.4590191873), (5.2713813011, 19.6730628417))
            Line((5.2713813011, 19.6730628417), (4.4725595079, 19.8871064961))
            Line((4.4725595079, 19.8871064961), (4.1928340339, 18.8431568152))
        make_face()
        with BuildLine():
            ThreePointArc((-0.8270011749, 19.2862771176), (0, 19.304), (0.8270011749, 19.2862771176))
            Line((0.8270011749, 19.2862771176), (0.8270011749, 20.3670533557))
            Line((0.8270011749, 20.3670533557), (0, 20.3670533557))
            Line((0, 20.3670533557), (-0.8270011749, 20.3670533557))
            Line((-0.8270011749, 20.3670533557), (-0.8270011749, 19.2862771176))
        make_face()
        with BuildLine():
            ThreePointArc((-5.7904776204, 18.4150695065), (-4.9962428467, 18.6462321507), (-4.1928340339, 18.8431568152))
            Line((-4.1928340339, 18.8431568152), (-4.4725595079, 19.8871064961))
            Line((-4.4725595079, 19.8871064961), (-5.2713813011, 19.6730628417))
            Line((-5.2713813011, 19.6730628417), (-6.0702030943, 19.4590191873))
            Line((-6.0702030943, 19.4590191873), (-5.7904776204, 18.4150695065))
        make_face()
        with BuildLine():
            ThreePointArc((-10.3593425852, 16.2889053408), (-9.652, 16.7177543947), (-8.9269345324, 17.1159065157))
            Line((-8.9269345324, 17.1159065157), (-9.4673226514, 18.0518861937))
            Line((-9.4673226514, 18.0518861937), (-10.1835266779, 17.6383856063))
            Line((-10.1835266779, 17.6383856063), (-10.8997307043, 17.2248850188))
            Line((-10.8997307043, 17.2248850188), (-10.3593425852, 16.2889053408))
        make_face()
        with BuildLine():
            ThreePointArc((-14.2222354725, 13.0526791949), (-13.649989304, 13.649989304), (-13.0526791949, 14.2222354725))
            Line((-13.0526791949, 14.2222354725), (-13.8169034018, 14.9864596794))
            Line((-13.8169034018, 14.9864596794), (-14.4016815406, 14.4016815406))
            Line((-14.4016815406, 14.4016815406), (-14.9864596794, 13.8169034018))
            Line((-14.9864596794, 13.8169034018), (-14.2222354725, 13.0526791949))
        make_face()
        with BuildLine():
            ThreePointArc((-17.1159065157, 8.9269345324), (-16.7177543947, 9.652), (-16.2889053408, 10.3593425852))
            Line((-16.2889053408, 10.3593425852), (-17.2248850188, 10.8997307043))
            Line((-17.2248850188, 10.8997307043), (-17.6383856063, 10.1835266779))
            Line((-17.6383856063, 10.1835266779), (-18.0518861937, 9.4673226514))
            Line((-18.0518861937, 9.4673226514), (-17.1159065157, 8.9269345324))
        make_face()
        with BuildLine():
            ThreePointArc((-18.8431568152, 4.1928340339), (-18.6462321507, 4.9962428467), (-18.4150695065, 5.7904776204))
            Line((-18.4150695065, 5.7904776204), (-19.4590191873, 6.0702030943))
            Line((-19.4590191873, 6.0702030943), (-19.6730628417, 5.2713813011))
            Line((-19.6730628417, 5.2713813011), (-19.8871064961, 4.4725595079))
            Line((-19.8871064961, 4.4725595079), (-18.8431568152, 4.1928340339))
        make_face()
    extrude(amount=F4_DEPTH, both=True)


solid = f1.part
